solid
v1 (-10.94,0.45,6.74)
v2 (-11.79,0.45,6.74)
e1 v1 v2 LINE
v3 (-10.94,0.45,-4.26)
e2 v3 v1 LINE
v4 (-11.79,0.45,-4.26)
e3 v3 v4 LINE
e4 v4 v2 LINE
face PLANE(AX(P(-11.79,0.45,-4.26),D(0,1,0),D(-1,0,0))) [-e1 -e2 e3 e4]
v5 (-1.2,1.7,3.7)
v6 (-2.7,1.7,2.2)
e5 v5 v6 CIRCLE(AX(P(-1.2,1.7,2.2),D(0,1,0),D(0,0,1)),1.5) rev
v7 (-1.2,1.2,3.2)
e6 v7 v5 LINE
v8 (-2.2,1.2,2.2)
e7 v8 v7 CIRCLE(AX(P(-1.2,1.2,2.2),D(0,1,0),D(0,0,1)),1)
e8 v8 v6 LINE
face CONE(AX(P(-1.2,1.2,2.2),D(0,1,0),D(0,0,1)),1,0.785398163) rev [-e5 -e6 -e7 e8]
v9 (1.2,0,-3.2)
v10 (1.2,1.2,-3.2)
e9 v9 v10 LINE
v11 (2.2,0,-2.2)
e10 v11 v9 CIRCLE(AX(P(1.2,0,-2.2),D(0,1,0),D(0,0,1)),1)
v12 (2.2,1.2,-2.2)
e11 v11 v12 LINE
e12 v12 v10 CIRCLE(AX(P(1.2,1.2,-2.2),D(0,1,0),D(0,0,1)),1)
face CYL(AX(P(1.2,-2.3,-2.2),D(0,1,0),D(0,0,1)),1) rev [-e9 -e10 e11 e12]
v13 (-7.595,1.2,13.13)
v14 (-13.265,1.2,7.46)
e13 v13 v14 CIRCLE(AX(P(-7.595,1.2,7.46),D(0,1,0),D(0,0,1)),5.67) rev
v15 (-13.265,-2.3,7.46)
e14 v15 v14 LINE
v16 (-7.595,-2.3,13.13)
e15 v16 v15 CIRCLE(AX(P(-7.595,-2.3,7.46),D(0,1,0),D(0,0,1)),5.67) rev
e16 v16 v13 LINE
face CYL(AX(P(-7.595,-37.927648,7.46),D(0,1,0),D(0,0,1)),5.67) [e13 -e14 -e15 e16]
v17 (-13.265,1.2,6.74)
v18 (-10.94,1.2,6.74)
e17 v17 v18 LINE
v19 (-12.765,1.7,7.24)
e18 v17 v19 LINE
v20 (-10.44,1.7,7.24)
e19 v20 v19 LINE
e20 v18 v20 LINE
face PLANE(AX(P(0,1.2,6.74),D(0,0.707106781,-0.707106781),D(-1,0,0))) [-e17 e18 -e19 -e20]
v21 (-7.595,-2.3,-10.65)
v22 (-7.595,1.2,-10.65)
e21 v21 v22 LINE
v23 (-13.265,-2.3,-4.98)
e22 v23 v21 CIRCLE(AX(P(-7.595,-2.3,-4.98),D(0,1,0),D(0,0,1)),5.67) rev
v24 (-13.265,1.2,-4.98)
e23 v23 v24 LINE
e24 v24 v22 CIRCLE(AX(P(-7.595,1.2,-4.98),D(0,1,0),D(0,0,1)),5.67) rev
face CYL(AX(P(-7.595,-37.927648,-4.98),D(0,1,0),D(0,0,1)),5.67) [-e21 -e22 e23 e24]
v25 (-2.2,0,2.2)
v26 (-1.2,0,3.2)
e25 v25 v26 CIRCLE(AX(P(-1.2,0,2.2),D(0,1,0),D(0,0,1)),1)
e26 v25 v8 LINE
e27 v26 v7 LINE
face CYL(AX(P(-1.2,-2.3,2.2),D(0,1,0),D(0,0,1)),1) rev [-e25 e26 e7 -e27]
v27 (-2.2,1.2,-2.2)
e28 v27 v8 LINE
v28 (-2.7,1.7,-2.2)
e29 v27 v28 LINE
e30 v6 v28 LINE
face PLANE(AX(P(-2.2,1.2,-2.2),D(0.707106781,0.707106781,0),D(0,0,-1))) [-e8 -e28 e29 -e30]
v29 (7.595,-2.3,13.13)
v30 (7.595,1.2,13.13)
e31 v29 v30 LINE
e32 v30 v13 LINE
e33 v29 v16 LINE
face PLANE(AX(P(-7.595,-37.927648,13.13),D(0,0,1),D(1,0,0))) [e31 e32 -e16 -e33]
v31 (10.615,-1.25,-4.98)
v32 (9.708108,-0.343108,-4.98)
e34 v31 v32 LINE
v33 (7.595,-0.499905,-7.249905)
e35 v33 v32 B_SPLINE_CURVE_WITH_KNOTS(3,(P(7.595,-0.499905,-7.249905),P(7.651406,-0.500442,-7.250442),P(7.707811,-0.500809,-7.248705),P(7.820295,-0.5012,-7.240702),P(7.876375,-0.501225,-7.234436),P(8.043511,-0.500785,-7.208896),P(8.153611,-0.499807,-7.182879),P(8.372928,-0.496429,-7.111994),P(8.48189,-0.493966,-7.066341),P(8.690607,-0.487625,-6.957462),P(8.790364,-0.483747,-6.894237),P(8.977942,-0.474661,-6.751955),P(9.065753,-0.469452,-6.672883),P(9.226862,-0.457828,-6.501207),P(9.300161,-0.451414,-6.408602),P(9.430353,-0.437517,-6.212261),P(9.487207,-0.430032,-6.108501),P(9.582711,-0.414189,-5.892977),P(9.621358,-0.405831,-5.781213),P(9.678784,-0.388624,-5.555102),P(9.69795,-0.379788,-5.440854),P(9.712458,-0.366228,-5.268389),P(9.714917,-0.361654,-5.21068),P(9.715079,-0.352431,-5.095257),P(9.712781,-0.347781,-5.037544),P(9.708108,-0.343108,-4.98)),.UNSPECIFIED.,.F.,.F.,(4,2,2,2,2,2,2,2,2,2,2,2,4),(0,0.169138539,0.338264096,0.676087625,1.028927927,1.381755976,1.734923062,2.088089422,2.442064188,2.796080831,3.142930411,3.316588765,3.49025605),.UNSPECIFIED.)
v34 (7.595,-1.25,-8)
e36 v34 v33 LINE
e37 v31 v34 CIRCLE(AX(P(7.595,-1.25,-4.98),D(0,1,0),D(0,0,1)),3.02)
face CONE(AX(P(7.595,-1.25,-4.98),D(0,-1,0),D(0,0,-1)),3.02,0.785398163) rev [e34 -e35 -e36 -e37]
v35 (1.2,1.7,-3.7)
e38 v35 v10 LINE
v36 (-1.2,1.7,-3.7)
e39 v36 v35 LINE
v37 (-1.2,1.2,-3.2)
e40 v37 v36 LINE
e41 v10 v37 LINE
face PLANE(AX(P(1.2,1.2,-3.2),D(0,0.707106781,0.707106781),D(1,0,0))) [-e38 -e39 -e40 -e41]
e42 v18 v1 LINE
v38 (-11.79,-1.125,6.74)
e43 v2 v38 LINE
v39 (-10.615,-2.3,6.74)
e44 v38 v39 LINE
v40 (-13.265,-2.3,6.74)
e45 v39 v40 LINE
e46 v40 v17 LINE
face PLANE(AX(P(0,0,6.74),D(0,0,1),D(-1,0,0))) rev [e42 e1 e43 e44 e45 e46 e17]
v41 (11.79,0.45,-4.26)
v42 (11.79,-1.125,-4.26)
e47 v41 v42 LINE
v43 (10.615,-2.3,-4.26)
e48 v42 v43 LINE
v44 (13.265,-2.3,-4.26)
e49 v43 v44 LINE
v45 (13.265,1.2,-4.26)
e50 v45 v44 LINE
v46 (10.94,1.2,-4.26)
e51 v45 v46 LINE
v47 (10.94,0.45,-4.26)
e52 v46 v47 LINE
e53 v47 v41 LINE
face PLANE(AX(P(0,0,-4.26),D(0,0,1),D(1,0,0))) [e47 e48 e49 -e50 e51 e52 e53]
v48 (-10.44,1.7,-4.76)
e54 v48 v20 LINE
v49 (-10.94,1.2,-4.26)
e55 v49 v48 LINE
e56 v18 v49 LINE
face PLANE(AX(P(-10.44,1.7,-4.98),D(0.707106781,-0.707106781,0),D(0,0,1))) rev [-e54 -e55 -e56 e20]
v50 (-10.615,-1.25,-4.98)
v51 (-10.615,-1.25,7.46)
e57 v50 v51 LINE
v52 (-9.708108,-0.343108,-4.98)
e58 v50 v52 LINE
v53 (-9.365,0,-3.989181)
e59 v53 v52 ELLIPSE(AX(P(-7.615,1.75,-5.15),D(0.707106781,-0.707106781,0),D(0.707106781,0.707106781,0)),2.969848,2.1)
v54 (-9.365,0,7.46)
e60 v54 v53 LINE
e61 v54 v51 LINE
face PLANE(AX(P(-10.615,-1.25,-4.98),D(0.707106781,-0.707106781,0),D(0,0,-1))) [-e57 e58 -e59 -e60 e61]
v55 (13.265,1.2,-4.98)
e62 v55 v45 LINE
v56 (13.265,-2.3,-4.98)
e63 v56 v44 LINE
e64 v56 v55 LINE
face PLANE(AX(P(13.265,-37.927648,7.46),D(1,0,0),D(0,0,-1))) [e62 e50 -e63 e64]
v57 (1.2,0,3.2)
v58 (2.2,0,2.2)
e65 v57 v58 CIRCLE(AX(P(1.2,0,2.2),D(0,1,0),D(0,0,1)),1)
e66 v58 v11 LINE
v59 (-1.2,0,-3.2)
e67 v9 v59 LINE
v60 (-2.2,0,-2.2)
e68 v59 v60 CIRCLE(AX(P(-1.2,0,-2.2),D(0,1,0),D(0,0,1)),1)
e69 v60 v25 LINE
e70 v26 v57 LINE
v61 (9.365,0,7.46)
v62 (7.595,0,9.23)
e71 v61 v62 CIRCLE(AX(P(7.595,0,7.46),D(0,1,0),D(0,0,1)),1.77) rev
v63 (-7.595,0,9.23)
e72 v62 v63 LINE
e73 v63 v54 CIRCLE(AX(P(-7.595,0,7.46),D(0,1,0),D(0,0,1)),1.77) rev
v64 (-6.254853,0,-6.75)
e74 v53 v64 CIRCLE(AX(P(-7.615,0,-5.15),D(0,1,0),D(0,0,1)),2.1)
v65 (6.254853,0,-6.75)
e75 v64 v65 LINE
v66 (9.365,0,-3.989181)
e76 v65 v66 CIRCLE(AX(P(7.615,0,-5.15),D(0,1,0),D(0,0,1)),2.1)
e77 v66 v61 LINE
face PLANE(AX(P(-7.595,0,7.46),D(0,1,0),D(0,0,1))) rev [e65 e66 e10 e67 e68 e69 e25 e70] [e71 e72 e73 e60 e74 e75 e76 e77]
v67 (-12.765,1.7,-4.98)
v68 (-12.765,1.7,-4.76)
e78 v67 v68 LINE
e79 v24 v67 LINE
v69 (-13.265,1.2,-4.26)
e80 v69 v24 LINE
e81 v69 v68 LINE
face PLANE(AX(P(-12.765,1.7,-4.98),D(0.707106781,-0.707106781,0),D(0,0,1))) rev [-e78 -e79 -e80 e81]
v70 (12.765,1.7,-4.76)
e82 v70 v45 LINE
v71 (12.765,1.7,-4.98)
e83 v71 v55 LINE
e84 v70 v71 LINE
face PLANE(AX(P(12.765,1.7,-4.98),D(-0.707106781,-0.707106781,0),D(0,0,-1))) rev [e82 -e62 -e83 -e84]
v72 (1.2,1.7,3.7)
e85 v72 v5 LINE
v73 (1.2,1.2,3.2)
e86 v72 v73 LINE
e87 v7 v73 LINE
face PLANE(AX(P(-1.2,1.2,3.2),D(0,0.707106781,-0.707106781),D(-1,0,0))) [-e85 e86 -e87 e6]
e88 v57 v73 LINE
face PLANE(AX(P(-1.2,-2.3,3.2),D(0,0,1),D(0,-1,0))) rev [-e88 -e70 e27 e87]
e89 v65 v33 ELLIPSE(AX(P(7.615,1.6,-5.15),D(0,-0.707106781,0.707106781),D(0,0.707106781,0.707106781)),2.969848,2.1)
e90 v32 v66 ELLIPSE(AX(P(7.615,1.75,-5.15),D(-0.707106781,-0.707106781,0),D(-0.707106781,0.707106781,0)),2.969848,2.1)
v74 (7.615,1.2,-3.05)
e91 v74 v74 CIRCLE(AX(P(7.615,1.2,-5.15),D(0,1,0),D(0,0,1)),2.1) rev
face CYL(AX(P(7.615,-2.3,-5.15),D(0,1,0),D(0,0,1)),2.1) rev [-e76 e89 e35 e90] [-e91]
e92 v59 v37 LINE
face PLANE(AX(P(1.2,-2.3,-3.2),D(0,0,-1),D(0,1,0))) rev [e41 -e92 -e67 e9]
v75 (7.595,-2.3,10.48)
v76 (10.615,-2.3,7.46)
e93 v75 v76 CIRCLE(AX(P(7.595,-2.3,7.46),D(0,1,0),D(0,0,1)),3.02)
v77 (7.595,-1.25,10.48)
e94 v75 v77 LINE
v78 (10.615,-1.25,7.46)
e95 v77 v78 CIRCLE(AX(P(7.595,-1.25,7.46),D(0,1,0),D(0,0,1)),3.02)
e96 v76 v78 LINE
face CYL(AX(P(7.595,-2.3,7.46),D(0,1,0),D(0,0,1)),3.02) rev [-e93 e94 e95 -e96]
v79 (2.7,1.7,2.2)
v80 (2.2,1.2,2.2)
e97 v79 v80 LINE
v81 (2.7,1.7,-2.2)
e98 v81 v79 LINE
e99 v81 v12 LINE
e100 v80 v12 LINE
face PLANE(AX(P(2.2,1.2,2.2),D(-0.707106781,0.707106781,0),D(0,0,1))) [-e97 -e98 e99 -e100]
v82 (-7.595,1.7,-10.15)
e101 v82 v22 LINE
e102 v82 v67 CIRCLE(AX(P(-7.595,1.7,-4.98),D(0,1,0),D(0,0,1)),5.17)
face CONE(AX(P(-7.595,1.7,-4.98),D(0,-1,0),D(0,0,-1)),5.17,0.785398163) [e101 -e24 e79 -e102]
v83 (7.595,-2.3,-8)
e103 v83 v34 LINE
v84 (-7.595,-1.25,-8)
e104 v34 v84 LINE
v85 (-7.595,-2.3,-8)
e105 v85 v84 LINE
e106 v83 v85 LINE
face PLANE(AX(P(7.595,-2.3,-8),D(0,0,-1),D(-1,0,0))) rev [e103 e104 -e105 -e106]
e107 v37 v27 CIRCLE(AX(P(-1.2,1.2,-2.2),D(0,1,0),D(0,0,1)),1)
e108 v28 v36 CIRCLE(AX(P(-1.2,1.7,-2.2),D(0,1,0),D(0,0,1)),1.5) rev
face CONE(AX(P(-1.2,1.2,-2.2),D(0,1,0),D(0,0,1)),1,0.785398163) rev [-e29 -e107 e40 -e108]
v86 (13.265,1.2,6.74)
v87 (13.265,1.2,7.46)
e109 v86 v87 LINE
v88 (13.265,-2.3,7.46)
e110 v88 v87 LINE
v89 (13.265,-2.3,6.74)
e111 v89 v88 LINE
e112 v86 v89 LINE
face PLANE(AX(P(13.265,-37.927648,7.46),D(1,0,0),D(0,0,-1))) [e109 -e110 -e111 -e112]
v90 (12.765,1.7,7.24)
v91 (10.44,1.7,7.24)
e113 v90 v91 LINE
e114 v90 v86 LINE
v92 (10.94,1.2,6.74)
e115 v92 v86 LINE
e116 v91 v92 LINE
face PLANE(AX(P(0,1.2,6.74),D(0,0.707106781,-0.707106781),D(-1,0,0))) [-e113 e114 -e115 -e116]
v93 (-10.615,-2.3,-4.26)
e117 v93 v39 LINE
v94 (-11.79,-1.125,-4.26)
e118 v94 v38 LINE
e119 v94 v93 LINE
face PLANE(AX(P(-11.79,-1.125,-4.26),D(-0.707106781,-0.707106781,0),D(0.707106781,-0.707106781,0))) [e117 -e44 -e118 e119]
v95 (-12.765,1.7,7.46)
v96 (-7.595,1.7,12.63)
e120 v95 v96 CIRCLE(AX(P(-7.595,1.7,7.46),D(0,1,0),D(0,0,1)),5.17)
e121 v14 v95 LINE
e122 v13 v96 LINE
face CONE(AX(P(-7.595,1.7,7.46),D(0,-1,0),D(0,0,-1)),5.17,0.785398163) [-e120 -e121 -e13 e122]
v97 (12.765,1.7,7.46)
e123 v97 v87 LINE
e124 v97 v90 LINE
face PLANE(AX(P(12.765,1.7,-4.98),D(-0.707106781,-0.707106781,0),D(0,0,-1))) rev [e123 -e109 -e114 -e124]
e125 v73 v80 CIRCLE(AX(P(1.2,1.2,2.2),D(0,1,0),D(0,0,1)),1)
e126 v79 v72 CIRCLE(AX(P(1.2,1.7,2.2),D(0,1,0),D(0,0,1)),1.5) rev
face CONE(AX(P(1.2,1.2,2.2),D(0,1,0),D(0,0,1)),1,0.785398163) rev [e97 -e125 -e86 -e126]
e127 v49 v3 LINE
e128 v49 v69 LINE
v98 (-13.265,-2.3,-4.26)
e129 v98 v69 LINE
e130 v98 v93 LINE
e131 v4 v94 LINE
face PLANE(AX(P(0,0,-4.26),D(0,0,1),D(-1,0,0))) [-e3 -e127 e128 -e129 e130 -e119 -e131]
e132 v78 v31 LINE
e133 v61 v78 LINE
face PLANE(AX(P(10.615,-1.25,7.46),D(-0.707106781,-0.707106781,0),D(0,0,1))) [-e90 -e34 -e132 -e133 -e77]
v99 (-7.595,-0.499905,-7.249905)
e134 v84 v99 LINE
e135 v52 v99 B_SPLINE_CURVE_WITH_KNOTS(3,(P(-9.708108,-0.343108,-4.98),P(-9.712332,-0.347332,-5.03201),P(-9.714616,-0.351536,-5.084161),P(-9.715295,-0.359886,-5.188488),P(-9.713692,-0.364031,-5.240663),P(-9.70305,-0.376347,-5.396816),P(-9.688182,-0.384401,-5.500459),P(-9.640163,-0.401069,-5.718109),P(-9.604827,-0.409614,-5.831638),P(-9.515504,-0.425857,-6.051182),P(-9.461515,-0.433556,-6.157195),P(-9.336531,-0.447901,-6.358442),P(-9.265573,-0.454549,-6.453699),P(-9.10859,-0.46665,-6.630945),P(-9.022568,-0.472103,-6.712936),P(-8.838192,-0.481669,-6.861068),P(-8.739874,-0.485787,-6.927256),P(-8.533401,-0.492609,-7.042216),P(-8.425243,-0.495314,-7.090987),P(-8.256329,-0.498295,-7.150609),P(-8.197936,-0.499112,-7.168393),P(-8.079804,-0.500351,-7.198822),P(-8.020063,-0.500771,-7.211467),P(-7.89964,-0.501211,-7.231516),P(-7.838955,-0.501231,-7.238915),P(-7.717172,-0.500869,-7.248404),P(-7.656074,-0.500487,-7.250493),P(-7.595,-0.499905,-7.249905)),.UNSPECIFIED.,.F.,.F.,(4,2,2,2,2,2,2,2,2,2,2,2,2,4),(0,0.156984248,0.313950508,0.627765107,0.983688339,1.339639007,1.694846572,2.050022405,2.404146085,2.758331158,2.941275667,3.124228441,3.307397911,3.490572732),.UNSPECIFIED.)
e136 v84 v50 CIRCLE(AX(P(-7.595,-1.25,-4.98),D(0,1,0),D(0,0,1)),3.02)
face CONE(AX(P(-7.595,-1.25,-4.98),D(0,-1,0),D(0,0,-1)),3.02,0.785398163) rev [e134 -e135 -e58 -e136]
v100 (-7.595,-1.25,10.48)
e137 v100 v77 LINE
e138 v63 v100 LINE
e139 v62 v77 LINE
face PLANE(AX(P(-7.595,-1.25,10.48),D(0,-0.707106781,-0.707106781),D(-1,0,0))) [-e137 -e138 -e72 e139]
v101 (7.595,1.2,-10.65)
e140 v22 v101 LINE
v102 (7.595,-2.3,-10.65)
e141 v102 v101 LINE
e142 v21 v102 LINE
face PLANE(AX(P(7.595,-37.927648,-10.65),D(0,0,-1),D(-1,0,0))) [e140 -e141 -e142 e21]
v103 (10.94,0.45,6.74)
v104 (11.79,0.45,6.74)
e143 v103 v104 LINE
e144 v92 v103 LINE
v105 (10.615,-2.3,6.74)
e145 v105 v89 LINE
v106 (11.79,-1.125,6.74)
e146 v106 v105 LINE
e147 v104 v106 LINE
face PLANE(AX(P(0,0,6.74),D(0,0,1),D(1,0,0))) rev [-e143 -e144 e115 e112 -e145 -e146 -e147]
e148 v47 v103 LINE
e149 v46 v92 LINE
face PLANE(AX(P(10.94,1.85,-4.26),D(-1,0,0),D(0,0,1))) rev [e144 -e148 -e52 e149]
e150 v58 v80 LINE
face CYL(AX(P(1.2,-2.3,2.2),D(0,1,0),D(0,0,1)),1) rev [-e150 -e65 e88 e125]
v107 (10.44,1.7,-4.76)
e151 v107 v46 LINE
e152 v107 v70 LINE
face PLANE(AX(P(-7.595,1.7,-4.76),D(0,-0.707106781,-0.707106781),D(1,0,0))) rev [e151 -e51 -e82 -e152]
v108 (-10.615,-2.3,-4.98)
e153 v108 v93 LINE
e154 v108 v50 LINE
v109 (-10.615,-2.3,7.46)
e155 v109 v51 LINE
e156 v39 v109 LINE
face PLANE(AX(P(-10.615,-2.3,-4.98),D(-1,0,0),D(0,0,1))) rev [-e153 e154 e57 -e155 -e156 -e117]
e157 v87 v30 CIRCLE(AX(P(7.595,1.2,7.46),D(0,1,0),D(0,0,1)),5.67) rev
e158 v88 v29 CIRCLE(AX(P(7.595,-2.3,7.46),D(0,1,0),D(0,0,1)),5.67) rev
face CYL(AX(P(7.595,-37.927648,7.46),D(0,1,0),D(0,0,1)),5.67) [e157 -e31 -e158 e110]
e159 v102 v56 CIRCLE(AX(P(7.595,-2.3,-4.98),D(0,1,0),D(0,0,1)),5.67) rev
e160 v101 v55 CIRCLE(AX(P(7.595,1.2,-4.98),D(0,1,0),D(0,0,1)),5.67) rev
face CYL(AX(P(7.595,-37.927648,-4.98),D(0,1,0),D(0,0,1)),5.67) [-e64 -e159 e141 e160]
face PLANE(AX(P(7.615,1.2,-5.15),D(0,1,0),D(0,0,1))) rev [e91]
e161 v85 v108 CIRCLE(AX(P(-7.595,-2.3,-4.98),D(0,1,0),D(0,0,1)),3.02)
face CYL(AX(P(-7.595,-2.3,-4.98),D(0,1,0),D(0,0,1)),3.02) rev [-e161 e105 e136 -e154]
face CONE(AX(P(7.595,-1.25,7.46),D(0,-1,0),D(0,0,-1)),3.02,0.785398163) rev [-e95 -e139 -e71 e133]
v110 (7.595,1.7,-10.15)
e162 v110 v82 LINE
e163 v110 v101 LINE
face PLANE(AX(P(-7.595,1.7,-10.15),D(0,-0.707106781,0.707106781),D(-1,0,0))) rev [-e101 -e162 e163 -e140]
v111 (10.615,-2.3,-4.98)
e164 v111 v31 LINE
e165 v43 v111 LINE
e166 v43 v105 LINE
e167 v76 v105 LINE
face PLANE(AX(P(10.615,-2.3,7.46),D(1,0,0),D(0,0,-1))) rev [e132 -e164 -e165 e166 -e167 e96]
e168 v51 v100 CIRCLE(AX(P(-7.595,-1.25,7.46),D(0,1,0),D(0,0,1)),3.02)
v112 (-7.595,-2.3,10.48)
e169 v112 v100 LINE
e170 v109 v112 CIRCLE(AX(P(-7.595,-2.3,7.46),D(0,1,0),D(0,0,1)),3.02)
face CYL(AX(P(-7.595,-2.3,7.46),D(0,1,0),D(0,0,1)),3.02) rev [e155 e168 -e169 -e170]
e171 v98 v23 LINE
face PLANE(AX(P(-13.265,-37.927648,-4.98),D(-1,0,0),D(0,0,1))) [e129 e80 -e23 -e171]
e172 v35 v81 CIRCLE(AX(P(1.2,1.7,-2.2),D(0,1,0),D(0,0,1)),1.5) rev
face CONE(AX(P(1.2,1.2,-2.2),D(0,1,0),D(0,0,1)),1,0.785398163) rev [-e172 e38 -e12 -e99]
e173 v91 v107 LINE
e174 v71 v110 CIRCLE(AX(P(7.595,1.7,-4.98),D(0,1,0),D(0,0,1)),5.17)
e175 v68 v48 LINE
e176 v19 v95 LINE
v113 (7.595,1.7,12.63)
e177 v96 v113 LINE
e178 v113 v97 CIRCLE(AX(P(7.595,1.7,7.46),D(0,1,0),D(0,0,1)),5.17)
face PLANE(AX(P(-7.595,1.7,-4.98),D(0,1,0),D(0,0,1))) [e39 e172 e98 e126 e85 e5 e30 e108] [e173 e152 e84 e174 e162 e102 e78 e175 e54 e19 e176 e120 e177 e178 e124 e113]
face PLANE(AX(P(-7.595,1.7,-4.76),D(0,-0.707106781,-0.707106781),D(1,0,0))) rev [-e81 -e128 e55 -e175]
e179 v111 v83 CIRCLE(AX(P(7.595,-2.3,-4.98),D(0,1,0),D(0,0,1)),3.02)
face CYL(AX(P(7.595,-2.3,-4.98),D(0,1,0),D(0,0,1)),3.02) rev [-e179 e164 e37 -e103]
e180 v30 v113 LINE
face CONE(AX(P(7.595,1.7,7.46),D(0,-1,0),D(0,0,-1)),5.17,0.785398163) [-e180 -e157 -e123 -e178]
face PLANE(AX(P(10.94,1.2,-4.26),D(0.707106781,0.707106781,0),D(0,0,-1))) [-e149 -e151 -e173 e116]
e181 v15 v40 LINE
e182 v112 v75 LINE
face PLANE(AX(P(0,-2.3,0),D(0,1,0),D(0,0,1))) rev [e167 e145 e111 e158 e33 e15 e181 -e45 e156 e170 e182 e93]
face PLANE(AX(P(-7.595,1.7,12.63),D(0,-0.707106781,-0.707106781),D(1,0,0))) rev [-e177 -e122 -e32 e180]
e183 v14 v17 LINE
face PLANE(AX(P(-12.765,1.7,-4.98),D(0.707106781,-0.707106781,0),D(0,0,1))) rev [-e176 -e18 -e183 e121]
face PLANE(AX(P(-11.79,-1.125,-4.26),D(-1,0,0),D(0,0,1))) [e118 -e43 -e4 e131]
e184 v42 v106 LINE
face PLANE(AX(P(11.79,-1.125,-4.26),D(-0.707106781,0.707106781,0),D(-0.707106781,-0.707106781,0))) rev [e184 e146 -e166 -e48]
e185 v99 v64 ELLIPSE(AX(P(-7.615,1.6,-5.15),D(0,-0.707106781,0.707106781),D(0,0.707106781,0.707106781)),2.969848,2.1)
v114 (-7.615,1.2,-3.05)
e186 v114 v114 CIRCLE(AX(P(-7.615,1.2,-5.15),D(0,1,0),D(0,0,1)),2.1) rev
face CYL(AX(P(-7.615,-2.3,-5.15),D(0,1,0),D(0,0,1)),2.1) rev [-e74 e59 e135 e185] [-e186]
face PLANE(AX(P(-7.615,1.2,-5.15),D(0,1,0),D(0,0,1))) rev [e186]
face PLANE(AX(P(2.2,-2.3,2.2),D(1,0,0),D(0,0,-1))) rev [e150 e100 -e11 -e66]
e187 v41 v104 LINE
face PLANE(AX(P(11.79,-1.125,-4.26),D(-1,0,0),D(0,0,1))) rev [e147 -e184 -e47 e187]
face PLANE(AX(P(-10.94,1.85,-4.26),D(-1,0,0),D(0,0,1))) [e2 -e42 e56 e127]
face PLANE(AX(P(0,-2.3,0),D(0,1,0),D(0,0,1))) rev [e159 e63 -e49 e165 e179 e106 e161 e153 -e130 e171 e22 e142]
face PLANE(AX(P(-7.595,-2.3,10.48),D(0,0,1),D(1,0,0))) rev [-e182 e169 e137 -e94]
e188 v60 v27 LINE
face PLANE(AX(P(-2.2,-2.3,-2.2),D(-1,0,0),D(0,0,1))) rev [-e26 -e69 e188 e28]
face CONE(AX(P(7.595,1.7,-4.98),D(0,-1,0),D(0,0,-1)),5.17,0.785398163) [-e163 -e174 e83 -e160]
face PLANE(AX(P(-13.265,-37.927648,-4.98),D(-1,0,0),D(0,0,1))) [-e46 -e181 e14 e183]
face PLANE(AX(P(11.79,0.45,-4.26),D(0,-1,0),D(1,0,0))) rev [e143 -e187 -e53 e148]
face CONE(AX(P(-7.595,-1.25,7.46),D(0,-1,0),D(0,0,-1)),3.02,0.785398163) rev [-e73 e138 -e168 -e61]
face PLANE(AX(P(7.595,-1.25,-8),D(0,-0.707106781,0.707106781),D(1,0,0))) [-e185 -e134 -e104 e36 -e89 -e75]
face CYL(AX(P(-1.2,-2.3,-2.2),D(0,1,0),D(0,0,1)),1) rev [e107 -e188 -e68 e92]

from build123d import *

# Parameters (mm, degrees)
BOSS_EXTRUDE1_DEPTH = 4
CUT_EXTRUDE1_START  = -1.7
CUT_EXTRUDE1_DEPTH  = 18.388140952
CUT_EXTRUDE2_DEPTH  = 20.088140952
SKETCH11_R          = 2.1
CUT_EXTRUDE4_DEPTH  = 20.088140952
CHAMFER1_SIZE       = 1.25
CUT_EXTRUDE5_DEPTH  = 5.5
SKETCH13_R          = 2.1
BOSS_EXTRUDE4_DEPTH = 0.5
CHAMFER3_SIZE       = 0.5


with BuildPart() as part:
    # Sketch1 → Boss-Extrude1 (new body)
    with BuildSketch(Plane(origin=(0, 1.7, 0), x_dir=(1, 0, 0), z_dir=(0, 1, 0))):
        with BuildLine():
            Line((-13.265, 4.98), (-13.265, -7.46))
            ThreePointArc((-13.265, -7.46), (-11.604295449, -11.469295449), (-7.595, -13.13))
            Line((-7.595, -13.13), (7.595, -13.13))
            ThreePointArc((7.595, -13.13), (11.604295449, -11.469295449), (13.265, -7.46))
            Line((13.265, -7.46), (13.265, 4.98))
            ThreePointArc((13.265, 4.98), (11.604295449, 8.989295449), (7.595, 10.65))
            Line((7.595, 10.65), (-7.595, 10.65))
            ThreePointArc((-7.595, 10.65), (-11.604295449, 8.989295449), (-13.265, 4.98))
        make_face()
    extrude(amount=-BOSS_EXTRUDE1_DEPTH)

    # Sketch5 → Cut-Extrude1 (cut, through all)
    with BuildSketch(Plane(origin=(0, 1.7, 0), x_dir=(1, 0, 0), z_dir=(0, 1, 0)).offset(CUT_EXTRUDE1_START)):
        with BuildLine():
            Line((-7.595, -10.48), (7.595, -10.48))
            ThreePointArc((7.595, -10.48), (9.730462479, -9.595462479), (10.615, -7.46))
            Line((10.615, -7.46), (10.615, 4.98))
            ThreePointArc((10.615, 4.98), (9.730462479, 7.115462479), (7.595, 8))
            Line((7.595, 8), (-7.595, 8))
            ThreePointArc((-7.595, 8), (-9.730462479, 7.115462479), (-10.615, 4.98))
            Line((-10.615, 4.98), (-10.615, -7.46))
            ThreePointArc((-10.615, -7.46), (-9.730462479, -9.595462479), (-7.595, -10.48))
        make_face()
    extrude(amount=-CUT_EXTRUDE1_DEPTH, mode=Mode.SUBTRACT)

    # Sketch7 → Cut-Extrude2 (cut, through all)
    with BuildSketch(Plane(origin=(0, 1.7, 0), x_dir=(1, 0, 0), z_dir=(0, 1, 0))):
        with BuildLine():
            Line((2.2, -2.2), (2.2, 2.2))
            ThreePointArc((2.2, 2.2), (1.907106781, 2.907106781), (1.2, 3.2))
            Line((1.2, 3.2), (-1.2, 3.2))
            ThreePointArc((-1.2, 3.2), (-1.907106781, 2.907106781), (-2.2, 2.2))
            Line((-2.2, 2.2), (-2.2, -2.2))
            ThreePointArc((-2.2, -2.2), (-1.907106781, -2.907106781), (-1.2, -3.2))
            Line((-1.2, -3.2), (1.2, -3.2))
            ThreePointArc((1.2, -3.2), (1.907106781, -2.907106781), (2.2, -2.2))
        make_face()
    extrude(amount=-CUT_EXTRUDE2_DEPTH, mode=Mode.SUBTRACT)

    # Sketch11 → Cut-Extrude4 (cut, through all)
    with BuildSketch(Plane(origin=(0, 1.7, 0), x_dir=(1, 0, 0), z_dir=(0, 1, 0))):
        with Locations(Location((-7.615, 5.15, 0), (0, 0, 270))):
            Circle(SKETCH11_R)
        with Locations(Location((7.615, 5.15, 0), (0, 0, 270))):
            Circle(SKETCH11_R)
    extrude(amount=-CUT_EXTRUDE4_DEPTH, mode=Mode.SUBTRACT)

    # Chamfer1
    # the kernel refuses this chamfer: 1.25 mm, written as the material it adds along each edge
    with BuildSketch(Plane(origin=(-7.595, 0, 7.46), x_dir=(-1, 0, 0), z_dir=(0, 0, -1))) as chamfer1_piece_1:
        Polygon((3.02, -CHAMFER1_SIZE), (3.02 - CHAMFER1_SIZE, 0), (3.02, 0), align=None)
    revolve(axis=Axis((-7.595, 0, 7.46), (0, 1, 0)), revolution_arc=90)
    with BuildSketch(Plane(origin=(-7.595, 0, 10.48), x_dir=(0, -0.9996219169112968, 0.027495876610586317), z_dir=(1, 0, 0))) as chamfer1_piece_2:
        Polygon((CHAMFER1_SIZE * 0.999621916911, CHAMFER1_SIZE * 0.0274958766106), (-CHAMFER1_SIZE * 0.0274958766106, CHAMFER1_SIZE * 0.999621916911), (0, 0), align=None)
    extrude(amount=15.19)
    with BuildSketch(Plane(origin=(7.595, 0, 7.46), x_dir=(0, 0, 1), z_dir=(-1, 0, 0))) as chamfer1_piece_3:
        Polygon((3.02, -CHAMFER1_SIZE), (3.02 - CHAMFER1_SIZE, 0), (3.02, 0), align=None)
    revolve(axis=Axis((7.595, 0, 7.46), (0, 1, 0)), revolution_arc=90)
    with BuildSketch(Plane(origin=(10.615, 0, 7.46), x_dir=(0.027495876610586317, -0.9996219169112968, 0), z_dir=(0, 0, -1))) as chamfer1_piece_4_section:
        Polygon((CHAMFER1_SIZE * 0.999621916911, CHAMFER1_SIZE * 0.0274958766106), (-CHAMFER1_SIZE * 0.0274958766106, CHAMFER1_SIZE * 0.999621916911), (0, 0), align=None)
    chamfer1_piece_4 = extrude(amount=12.44, mode=Mode.PRIVATE)
    chamfer1_piece_4 = chamfer1_piece_4 - Plane(origin=(7.615, -0.413583305, -5.15), x_dir=(0, 0, 1), z_dir=(0, 1, 0)) * Cylinder(2.1, 30, mode=Mode.PRIVATE)
    add(chamfer1_piece_4)
    with BuildSketch(Plane(origin=(7.595, 0, -4.98), x_dir=(1, 0, 0), z_dir=(0, 0, 1))) as chamfer1_piece_5_section:
        Polygon((3.02, -CHAMFER1_SIZE), (3.02 - CHAMFER1_SIZE, 0), (3.02, 0), align=None)
    chamfer1_piece_5 = revolve(axis=Axis((7.595, 0, -4.98), (0, 1, 0)), revolution_arc=90, mode=Mode.PRIVATE)
    chamfer1_piece_5 = chamfer1_piece_5 - Plane(origin=(7.615, -0.471032406, -5.15), x_dir=(0, 0, 1), z_dir=(0, 1, 0)) * Cylinder(2.1, 13, mode=Mode.PRIVATE)
    add(chamfer1_piece_5)
    with BuildSketch(Plane(origin=(7.595, 0, -8), x_dir=(0, -0.9996219169112968, -0.027495876610586317), z_dir=(-1, 0, 0))) as chamfer1_piece_6_section:
        Polygon((CHAMFER1_SIZE * 0.999621916911, CHAMFER1_SIZE * 0.0274958766106), (-CHAMFER1_SIZE * 0.0274958766106, CHAMFER1_SIZE * 0.999621916911), (0, 0), align=None)
    chamfer1_piece_6 = extrude(amount=15.19, mode=Mode.PRIVATE)
    chamfer1_piece_6 = chamfer1_piece_6 - Plane(origin=(-7.615, -0.417580446, -5.15), x_dir=(0, 0, 1), z_dir=(0, 1, 0)) * Cylinder(2.1, 36, mode=Mode.PRIVATE)
    chamfer1_piece_6 = chamfer1_piece_6 - Plane(origin=(7.615, -0.417580446, -5.15), x_dir=(0, 0, 1), z_dir=(0, 1, 0)) * Cylinder(2.1, 36, mode=Mode.PRIVATE)
    add(chamfer1_piece_6)
    with BuildSketch(Plane(origin=(-7.595, 0, -4.98), x_dir=(0, 0, -1), z_dir=(1, 0, 0))) as chamfer1_piece_7_section:
        Polygon((3.02, -CHAMFER1_SIZE), (3.02 - CHAMFER1_SIZE, 0), (3.02, 0), align=None)
    chamfer1_piece_7 = revolve(axis=Axis((-7.595, 0, -4.98), (0, 1, 0)), revolution_arc=90, mode=Mode.PRIVATE)
    chamfer1_piece_7 = chamfer1_piece_7 - Plane(origin=(-7.615, -0.471032404, -5.15), x_dir=(0, 0, 1), z_dir=(0, 1, 0)) * Cylinder(2.1, 13, mode=Mode.PRIVATE)
    add(chamfer1_piece_7)
    with BuildSketch(Plane(origin=(-10.615, 0, -4.98), x_dir=(-0.027495876610586317, -0.9996219169112968, 0), z_dir=(0, 0, 1))) as chamfer1_piece_8_section:
        Polygon((CHAMFER1_SIZE * 0.999621916911, CHAMFER1_SIZE * 0.0274958766106), (-CHAMFER1_SIZE * 0.0274958766106, CHAMFER1_SIZE * 0.999621916911), (0, 0), align=None)
    chamfer1_piece_8 = extrude(amount=12.44, mode=Mode.PRIVATE)
    chamfer1_piece_8 = chamfer1_piece_8 - Plane(origin=(-7.615, -0.413583304, -5.15), x_dir=(0, 0, 1), z_dir=(0, 1, 0)) * Cylinder(2.1, 30, mode=Mode.PRIVATE)
    add(chamfer1_piece_8)

    # Sketch12 → Cut-Extrude5 (cut, symmetric)
    with BuildSketch(Plane.XY.offset(1.24)):
        Polygon((11.79, -2.45), (13.415, -2.45), (13.415, 1.85), (10.94, 1.85), (10.94, 0.45), (11.79, 0.45), (11.79, -1.125), (10.615, -2.3), (11.79, -2.3), align=None)
    cut_extrude5 = extrude(amount=CUT_EXTRUDE5_DEPTH, both=True, mode=Mode.SUBTRACT)

    # Mirror1: Cut-Extrude5 across plane
    add(cut_extrude5.mirror(Plane(origin=(0, 0, 0), x_dir=(0, 0, 1), z_dir=(1, 0, 0))), mode=Mode.SUBTRACT)

    # Sketch13 → Boss-Extrude4 (add)
    with BuildSketch(Plane(origin=(0, 1.7, 0), x_dir=(1, 0, 0), z_dir=(0, 1, 0))):
        with Locations(Location((7.615, 5.15, 0), (0, 0, 270))):
            Circle(SKETCH13_R)
        with Locations(Location((-7.615, 5.15, 0), (0, 0, 270))):
            Circle(SKETCH13_R)
    extrude(amount=-BOSS_EXTRUDE4_DEPTH)

    # Chamfer3
    chamfer3_edges = [part.edges().sort_by_distance(p)[0] for p in [
        (-13.265, 1.7, -4.62),
        (-11.604295449, 1.7, -8.989295449),
        (13.265, 1.7, -4.62),
        (10.94, 1.7, 1.24),
        (12.1025, 1.7, 6.74),
        (12.1025, 1.7, -4.26),
        (-13.265, 1.7, 7.1),
        (-10.94, 1.7, 1.24),
        (-12.1025, 1.7, 6.74),
        (-12.1025, 1.7, -4.26),
        (-1.907106781, 1.7, 2.907106781),
        (0, 1.7, 3.2),
        (1.907106781, 1.7, 2.907106781),
        (2.2, 1.7, 0),
        (1.907106781, 1.7, -2.907106781),
        (0, 1.7, -3.2),
        (0, 1.7, -10.65),
        (-1.907106781, 1.7, -2.907106781),
        (-2.2, 1.7, 0),
        (11.604295449, 1.7, -8.989295449),
        (13.265, 1.7, 7.1),
        (11.604295449, 1.7, 11.469295449),
        (0, 1.7, 13.13),
        (-11.604295449, 1.7, 11.469295449),
    ]]
    chamfer(chamfer3_edges, length=CHAMFER3_SIZE)


solid = part.part
